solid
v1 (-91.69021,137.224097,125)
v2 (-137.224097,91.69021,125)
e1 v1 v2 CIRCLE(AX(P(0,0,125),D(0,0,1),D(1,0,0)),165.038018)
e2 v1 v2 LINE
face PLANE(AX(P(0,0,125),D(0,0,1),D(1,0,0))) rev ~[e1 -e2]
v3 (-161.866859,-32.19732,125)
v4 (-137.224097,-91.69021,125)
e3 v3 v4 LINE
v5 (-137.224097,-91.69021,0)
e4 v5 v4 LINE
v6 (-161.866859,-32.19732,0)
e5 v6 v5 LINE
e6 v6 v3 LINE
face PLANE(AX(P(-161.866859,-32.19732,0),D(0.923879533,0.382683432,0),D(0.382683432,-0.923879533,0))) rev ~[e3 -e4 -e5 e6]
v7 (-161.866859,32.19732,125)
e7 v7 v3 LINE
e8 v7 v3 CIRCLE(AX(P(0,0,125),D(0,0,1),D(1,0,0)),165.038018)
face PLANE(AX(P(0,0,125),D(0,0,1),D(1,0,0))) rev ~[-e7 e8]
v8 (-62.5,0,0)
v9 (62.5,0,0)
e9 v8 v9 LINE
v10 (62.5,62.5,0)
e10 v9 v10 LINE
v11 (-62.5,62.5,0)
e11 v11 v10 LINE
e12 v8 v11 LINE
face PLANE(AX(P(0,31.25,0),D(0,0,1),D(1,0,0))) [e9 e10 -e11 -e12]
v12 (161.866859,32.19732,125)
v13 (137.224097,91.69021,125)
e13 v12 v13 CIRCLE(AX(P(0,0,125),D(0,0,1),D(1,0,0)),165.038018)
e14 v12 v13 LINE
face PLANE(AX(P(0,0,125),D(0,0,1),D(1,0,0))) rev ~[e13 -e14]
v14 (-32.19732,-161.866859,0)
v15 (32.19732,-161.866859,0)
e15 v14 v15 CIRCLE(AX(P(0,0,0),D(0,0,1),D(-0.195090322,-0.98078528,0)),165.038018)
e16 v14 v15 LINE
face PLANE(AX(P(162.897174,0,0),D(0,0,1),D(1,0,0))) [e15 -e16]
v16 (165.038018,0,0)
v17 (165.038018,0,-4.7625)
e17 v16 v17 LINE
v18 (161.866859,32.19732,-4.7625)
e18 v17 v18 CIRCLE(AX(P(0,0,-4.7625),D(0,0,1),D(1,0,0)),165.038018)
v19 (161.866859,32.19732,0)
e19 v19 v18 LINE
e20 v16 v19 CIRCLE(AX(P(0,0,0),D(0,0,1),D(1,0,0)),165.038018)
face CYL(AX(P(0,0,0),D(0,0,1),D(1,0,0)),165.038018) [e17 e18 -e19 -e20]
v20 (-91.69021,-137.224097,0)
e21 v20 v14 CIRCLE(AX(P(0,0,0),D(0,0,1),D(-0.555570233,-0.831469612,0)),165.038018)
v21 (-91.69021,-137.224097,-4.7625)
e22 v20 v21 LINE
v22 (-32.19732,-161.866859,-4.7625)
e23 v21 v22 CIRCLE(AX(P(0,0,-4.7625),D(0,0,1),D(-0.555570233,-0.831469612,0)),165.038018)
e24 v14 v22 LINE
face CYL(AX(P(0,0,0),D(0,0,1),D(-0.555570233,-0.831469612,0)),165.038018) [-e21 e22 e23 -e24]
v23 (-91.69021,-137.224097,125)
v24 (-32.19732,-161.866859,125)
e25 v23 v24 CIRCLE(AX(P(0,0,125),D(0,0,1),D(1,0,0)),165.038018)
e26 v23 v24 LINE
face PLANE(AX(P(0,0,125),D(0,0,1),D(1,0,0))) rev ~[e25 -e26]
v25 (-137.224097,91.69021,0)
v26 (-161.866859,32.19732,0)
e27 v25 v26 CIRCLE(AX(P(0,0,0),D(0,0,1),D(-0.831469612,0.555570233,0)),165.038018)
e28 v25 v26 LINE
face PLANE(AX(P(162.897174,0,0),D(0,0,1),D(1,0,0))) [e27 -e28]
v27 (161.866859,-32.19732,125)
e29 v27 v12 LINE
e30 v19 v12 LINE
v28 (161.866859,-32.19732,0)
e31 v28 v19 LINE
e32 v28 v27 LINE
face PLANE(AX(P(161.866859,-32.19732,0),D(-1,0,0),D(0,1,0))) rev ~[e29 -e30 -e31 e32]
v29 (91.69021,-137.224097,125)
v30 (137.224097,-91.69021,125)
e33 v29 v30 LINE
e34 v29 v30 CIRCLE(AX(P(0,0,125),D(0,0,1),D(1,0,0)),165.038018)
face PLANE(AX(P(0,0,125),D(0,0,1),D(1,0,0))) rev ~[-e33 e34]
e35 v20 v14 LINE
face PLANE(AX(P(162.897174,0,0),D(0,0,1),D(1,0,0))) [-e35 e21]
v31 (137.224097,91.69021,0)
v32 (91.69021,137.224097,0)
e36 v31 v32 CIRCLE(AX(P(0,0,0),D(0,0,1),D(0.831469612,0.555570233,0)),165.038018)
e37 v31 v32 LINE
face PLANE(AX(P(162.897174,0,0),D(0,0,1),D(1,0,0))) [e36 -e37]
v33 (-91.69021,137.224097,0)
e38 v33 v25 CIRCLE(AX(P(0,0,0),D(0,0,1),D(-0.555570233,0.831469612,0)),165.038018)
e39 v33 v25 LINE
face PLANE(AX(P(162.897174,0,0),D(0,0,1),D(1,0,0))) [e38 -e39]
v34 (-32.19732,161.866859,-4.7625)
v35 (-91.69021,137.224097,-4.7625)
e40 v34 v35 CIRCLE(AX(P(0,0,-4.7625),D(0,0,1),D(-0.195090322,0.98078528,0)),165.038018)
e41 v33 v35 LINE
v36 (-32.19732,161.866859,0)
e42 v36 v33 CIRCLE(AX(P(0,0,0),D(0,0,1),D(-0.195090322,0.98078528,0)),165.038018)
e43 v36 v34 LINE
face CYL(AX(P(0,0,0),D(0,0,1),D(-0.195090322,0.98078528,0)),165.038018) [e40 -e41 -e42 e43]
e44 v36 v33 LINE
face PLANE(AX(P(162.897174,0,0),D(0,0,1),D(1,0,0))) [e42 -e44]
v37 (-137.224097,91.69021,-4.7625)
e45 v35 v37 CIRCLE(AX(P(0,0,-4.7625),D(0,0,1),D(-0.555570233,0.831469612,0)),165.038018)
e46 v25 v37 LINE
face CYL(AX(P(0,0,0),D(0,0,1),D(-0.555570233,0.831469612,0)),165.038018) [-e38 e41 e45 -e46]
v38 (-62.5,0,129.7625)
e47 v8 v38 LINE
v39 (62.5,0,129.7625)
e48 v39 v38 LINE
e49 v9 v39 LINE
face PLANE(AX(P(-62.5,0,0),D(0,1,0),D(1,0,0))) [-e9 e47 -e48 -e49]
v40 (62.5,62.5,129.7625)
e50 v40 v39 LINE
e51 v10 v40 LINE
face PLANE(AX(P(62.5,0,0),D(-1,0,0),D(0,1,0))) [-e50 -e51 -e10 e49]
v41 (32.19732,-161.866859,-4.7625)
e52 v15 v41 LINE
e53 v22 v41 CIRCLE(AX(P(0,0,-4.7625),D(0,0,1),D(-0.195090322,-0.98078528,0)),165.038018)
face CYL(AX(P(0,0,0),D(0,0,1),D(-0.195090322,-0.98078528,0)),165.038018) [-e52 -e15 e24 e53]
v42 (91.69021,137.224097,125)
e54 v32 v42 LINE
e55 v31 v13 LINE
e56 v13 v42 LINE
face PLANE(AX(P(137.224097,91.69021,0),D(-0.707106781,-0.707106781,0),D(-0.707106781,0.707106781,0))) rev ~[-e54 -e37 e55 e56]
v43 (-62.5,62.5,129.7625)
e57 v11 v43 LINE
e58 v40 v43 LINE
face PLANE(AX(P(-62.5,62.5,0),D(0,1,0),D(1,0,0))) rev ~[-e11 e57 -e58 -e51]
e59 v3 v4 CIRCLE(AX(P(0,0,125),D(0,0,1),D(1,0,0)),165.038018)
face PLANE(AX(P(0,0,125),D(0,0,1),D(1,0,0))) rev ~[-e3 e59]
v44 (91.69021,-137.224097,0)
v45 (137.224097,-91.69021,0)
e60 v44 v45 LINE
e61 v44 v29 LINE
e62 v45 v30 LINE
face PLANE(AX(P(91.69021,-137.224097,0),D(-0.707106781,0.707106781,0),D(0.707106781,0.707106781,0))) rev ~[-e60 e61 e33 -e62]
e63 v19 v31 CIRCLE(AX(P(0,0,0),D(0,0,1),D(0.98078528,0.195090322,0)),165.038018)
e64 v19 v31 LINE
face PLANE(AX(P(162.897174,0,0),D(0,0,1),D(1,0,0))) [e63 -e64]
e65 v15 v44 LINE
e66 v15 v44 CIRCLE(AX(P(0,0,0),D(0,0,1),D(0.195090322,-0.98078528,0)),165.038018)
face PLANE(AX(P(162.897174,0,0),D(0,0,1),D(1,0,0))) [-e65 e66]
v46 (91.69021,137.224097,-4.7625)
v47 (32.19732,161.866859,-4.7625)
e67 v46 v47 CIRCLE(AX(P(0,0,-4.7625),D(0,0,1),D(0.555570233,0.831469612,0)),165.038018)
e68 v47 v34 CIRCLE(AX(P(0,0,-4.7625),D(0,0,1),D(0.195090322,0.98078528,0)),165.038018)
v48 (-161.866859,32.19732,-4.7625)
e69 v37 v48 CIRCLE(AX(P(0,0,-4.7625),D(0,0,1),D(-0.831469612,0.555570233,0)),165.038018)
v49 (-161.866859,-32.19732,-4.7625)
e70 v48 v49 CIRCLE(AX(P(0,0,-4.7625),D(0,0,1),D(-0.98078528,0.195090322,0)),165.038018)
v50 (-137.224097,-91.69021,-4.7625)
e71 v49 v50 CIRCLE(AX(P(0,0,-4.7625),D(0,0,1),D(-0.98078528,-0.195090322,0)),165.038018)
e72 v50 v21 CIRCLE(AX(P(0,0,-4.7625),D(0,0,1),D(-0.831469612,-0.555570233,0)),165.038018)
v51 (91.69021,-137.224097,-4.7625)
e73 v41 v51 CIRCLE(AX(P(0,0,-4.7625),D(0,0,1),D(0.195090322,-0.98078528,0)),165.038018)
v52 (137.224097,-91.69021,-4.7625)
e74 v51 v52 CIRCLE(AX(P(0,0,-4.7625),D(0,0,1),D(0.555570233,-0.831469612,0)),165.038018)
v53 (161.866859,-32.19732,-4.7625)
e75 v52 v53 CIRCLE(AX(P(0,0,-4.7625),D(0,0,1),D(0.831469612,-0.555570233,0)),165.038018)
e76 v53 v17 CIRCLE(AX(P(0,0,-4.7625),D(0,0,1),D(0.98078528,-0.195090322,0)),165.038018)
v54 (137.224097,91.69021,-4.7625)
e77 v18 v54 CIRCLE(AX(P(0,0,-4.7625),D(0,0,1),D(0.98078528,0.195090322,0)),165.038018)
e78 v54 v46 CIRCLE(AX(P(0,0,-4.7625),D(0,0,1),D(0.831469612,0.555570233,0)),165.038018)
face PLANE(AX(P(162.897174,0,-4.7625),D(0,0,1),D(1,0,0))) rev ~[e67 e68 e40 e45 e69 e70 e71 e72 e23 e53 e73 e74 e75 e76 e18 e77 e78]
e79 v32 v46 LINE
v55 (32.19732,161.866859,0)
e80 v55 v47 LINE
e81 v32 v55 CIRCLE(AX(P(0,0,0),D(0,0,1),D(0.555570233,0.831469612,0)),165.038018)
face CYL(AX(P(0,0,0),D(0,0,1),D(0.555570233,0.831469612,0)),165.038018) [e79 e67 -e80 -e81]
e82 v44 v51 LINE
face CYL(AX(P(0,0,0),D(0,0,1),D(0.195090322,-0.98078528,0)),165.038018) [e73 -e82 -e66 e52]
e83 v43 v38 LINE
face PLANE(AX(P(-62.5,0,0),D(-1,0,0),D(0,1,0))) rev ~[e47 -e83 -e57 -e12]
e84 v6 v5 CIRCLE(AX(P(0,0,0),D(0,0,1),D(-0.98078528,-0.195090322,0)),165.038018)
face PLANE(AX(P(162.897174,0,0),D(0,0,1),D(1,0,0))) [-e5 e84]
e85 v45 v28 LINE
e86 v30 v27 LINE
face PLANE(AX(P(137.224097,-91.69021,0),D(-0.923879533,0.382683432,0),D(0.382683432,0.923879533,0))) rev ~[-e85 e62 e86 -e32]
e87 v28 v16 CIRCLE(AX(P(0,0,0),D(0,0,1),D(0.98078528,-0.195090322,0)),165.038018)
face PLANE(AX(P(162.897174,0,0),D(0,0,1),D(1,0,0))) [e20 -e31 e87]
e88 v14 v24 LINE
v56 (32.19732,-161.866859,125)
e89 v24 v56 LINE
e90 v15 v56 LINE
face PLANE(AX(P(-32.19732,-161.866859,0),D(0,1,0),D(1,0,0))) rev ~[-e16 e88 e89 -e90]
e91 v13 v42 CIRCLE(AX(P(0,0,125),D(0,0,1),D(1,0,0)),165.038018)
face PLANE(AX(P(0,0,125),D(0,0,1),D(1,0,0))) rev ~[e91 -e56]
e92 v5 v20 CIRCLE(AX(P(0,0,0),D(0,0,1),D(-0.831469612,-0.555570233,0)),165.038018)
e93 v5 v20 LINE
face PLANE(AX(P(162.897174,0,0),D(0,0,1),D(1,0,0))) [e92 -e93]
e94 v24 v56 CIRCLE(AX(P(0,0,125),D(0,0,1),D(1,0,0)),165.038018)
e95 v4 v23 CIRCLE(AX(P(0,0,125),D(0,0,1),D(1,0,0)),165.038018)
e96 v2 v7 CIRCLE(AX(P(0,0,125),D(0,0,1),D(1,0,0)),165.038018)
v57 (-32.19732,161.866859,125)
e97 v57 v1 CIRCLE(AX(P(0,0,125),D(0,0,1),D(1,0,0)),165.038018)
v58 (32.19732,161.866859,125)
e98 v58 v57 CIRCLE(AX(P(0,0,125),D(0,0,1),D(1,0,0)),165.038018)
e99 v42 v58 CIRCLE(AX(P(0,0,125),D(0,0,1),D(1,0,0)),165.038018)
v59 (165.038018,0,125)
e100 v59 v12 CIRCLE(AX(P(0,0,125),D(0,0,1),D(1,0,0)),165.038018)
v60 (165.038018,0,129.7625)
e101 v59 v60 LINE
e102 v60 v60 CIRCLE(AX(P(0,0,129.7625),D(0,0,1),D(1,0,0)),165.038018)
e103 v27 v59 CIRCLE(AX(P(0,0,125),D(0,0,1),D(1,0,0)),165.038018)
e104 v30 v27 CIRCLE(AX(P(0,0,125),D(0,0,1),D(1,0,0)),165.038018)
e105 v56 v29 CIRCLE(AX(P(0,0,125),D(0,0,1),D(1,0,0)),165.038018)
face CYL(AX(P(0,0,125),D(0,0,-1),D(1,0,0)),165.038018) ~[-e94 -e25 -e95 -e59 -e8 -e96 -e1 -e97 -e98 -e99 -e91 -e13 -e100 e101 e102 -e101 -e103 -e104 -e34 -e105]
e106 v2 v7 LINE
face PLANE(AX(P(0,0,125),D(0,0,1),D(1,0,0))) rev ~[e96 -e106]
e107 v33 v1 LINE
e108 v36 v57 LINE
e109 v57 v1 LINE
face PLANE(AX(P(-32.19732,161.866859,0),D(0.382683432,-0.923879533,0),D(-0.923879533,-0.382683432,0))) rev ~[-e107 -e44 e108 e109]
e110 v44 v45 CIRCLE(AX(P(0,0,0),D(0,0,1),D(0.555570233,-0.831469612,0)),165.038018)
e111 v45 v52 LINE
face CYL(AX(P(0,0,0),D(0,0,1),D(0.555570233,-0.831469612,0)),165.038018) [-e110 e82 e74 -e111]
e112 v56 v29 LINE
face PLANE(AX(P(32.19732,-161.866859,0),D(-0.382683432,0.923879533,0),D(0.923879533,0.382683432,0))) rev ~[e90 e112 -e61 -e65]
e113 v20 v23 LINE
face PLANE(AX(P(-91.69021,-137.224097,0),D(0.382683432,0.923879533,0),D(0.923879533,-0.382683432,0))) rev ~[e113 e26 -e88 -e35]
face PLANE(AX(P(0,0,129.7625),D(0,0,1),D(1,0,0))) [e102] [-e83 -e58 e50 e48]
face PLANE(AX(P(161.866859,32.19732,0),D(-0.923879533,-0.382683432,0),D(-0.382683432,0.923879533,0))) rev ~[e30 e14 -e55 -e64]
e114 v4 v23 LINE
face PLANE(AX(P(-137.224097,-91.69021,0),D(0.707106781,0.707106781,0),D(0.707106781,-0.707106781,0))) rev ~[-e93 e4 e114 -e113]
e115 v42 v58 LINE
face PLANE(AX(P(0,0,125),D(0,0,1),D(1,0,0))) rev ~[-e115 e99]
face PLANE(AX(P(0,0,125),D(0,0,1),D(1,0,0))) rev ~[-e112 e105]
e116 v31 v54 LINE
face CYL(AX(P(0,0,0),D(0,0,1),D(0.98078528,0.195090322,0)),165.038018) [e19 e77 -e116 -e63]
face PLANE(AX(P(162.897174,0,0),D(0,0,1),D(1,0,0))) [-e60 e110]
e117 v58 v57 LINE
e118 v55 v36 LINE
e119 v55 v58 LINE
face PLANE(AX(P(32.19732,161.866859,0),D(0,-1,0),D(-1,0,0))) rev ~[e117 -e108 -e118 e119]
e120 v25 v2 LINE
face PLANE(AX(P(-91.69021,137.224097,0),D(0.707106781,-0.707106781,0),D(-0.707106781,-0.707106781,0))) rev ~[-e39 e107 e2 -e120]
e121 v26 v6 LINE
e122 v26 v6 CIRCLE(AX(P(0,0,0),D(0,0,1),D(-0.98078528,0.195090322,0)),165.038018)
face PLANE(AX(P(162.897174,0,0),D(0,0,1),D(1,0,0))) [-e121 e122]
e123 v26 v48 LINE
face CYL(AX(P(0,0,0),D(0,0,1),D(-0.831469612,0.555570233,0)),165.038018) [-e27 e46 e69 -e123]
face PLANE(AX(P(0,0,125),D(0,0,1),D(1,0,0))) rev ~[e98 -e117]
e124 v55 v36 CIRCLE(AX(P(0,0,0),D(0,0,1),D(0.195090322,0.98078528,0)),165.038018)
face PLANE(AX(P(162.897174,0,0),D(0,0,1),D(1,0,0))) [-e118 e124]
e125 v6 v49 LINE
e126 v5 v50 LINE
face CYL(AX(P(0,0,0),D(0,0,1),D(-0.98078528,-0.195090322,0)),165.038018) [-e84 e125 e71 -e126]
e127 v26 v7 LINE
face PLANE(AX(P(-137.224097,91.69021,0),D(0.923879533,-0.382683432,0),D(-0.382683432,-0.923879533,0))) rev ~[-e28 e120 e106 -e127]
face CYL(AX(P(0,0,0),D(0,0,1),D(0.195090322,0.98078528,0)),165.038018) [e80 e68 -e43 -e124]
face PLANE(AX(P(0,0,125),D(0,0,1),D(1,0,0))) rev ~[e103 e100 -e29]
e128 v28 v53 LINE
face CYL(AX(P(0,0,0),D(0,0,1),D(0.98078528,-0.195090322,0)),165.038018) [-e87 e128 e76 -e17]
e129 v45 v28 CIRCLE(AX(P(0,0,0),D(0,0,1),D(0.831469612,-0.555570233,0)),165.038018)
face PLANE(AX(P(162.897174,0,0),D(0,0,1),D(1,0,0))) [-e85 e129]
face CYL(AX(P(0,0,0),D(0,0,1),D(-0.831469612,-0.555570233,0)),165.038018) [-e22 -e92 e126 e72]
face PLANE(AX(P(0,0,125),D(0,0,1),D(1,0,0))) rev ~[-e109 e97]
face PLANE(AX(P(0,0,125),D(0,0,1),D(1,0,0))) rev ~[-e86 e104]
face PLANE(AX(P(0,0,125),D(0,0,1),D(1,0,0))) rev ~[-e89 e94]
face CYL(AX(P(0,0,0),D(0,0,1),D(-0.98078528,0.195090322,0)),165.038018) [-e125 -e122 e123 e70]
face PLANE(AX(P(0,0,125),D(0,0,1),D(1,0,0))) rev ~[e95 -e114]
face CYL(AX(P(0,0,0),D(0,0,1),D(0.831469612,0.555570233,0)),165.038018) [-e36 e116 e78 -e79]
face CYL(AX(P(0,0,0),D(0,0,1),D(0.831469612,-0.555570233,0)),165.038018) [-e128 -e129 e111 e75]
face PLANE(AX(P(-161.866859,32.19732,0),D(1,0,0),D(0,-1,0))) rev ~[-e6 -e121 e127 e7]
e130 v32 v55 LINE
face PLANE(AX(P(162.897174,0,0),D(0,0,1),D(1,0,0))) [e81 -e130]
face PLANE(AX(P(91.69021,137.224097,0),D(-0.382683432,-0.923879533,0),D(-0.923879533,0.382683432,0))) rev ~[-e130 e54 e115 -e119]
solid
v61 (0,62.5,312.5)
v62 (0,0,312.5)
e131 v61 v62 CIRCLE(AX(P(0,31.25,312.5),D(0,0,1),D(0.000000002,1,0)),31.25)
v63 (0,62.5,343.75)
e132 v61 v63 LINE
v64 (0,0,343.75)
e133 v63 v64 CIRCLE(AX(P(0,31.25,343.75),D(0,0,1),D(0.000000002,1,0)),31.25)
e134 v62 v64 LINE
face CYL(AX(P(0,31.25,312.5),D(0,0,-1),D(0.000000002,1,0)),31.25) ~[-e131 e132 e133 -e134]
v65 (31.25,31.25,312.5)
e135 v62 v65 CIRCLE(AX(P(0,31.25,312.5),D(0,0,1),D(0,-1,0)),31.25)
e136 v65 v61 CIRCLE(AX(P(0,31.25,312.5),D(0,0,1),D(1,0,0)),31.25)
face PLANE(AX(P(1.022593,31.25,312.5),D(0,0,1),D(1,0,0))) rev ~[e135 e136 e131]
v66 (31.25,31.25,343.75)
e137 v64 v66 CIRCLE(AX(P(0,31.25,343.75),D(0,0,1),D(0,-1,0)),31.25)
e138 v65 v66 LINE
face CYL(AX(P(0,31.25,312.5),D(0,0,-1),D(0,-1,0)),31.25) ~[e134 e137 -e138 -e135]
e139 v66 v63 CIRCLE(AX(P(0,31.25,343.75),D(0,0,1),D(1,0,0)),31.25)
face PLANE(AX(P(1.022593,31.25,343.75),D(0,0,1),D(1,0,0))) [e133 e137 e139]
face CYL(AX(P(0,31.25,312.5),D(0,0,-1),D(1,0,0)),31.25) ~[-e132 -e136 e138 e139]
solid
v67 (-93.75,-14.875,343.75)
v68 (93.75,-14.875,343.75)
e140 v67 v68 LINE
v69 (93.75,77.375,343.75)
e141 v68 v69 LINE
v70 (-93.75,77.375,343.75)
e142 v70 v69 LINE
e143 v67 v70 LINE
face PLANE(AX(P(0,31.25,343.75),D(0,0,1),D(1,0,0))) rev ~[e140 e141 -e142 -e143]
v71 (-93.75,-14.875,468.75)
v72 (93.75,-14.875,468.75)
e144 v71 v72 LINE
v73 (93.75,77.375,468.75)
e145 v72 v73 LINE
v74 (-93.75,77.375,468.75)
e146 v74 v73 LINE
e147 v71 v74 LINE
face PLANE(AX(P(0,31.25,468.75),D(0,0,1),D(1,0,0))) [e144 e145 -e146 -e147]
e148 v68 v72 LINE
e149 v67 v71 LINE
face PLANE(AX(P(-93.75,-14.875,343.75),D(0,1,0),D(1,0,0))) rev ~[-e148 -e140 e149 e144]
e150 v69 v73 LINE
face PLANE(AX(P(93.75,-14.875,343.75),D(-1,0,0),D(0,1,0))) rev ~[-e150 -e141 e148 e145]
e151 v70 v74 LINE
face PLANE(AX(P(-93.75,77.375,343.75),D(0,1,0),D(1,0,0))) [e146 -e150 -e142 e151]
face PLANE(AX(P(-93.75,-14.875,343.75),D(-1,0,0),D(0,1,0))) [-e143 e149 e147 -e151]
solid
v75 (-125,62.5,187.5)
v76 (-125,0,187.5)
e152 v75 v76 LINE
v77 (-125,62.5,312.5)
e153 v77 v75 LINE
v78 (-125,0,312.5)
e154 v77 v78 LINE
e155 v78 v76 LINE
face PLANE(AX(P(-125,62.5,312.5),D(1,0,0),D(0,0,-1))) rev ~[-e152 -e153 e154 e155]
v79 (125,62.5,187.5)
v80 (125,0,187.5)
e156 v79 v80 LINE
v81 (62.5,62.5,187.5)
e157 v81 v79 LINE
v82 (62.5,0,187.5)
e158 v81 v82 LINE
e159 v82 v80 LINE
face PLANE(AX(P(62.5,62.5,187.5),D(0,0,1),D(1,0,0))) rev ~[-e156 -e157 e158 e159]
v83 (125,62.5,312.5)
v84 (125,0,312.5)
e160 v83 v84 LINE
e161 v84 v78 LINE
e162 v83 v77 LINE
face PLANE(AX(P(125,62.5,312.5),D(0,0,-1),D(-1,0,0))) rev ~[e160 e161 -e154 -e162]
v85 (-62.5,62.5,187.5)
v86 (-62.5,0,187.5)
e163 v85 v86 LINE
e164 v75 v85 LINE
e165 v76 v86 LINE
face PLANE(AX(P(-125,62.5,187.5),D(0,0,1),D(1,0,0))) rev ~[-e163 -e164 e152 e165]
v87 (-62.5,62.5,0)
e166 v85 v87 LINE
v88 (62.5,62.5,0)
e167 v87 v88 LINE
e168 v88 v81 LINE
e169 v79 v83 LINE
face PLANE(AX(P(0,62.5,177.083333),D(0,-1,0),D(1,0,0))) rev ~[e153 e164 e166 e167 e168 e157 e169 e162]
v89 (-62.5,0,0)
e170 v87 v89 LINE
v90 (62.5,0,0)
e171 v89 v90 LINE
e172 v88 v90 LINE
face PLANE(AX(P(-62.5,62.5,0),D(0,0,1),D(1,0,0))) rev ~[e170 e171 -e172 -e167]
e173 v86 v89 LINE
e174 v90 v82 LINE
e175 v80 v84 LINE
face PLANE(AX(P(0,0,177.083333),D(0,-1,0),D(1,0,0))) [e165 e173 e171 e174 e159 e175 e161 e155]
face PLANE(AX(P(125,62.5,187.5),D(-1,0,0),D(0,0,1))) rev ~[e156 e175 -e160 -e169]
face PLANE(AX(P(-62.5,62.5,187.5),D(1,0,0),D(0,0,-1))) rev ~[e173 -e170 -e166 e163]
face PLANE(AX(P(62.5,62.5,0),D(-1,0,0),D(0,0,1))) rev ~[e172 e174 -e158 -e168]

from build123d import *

# Parameters (mm, degrees)
F3_W      = 125
F3_H      = 62.5
F4_DEPTH  = 4.7625
F5_DEPTH  = 125
F6_R      = 165.0380183748
F7_DEPTH  = 4.7625
F8_DEPTH  = 386
F11_DEPTH = 62.5
F13_DEPTH = 31.25
F14_W     = 187.5
F14_H     = 92.25
F15_DEPTH = 125


# Not quite as in the source:
# - a length typed as a fraction of an inch, garbled in the dataset ("3 / 203.2 mm" for 3/8 in), is restored
# - a feature names something its author has since deleted; it is built from what else it names


with BuildPart() as f4:
    # F3 (on Top) → F4 (new body)
    with BuildSketch(Plane.XY):
        with BuildLine():
            ThreePointArc((161.8668591289, -32.1973201496), (164.2433152069, -16.1765546068), (165.0380183748, 0))
            ThreePointArc((165.0380183748, 0), (164.2433152069, 16.1765546068), (161.8668591289, 32.1973201496))
            Line((161.8668591289, 32.1973201496), (161.8668591289, -32.1973201496))
        make_face()
        with BuildLine():
            Line((137.2240971533, 91.6902103256), (161.8668591289, 32.1973201496))
            ThreePointArc((161.8668591289, 32.1973201496), (152.4752472627, 63.1573153424), (137.2240971533, 91.6902103256))
        make_face()
        Polygon((161.8668591289, -32.1973201496), (161.8668591289, 32.1973201496), (137.2240971533, 91.6902103256), (91.6902103256, 137.2240971533), (32.1973201496, 161.8668591289), (-32.1973201496, 161.8668591289), (-91.6902103256, 137.2240971533), (-137.2240971533, 91.6902103256), (-161.8668591289, 32.1973201496), (-161.8668591289, -32.1973201496), (-137.2240971533, -91.6902103256), (-91.6902103256, -137.2240971533), (-32.1973201496, -161.8668591289), (32.1973201496, -161.8668591289), (91.6902103256, -137.2240971533), (137.2240971533, -91.6902103256), align=None)
        with Locations((0, 31.25)):
            Rectangle(F3_W, F3_H, mode=Mode.SUBTRACT)
        with BuildLine():
            ThreePointArc((137.2240971533, -91.6902103256), (152.4752472627, -63.1573153424), (161.8668591289, -32.1973201496))
            Line((161.8668591289, -32.1973201496), (137.2240971533, -91.6902103256))
        make_face()
        with BuildLine():
            Line((91.6902103256, 137.2240971533), (137.2240971533, 91.6902103256))
            ThreePointArc((137.2240971533, 91.6902103256), (116.6995019464, 116.6995019464), (91.6902103256, 137.2240971533))
        make_face()
        with BuildLine():
            ThreePointArc((91.6902103256, -137.2240971533), (116.6995019464, -116.6995019464), (137.2240971533, -91.6902103256))
            Line((137.2240971533, -91.6902103256), (91.6902103256, -137.2240971533))
        make_face()
        with BuildLine():
            Line((32.1973201496, 161.8668591289), (91.6902103256, 137.2240971533))
            ThreePointArc((91.6902103256, 137.2240971533), (63.1573153424, 152.4752472627), (32.1973201496, 161.8668591289))
        make_face()
        with BuildLine():
            ThreePointArc((32.1973201496, -161.8668591289), (63.1573153424, -152.4752472627), (91.6902103256, -137.2240971533))
            Line((91.6902103256, -137.2240971533), (32.1973201496, -161.8668591289))
        make_face()
        with BuildLine():
            Line((-32.1973201496, 161.8668591289), (32.1973201496, 161.8668591289))
            ThreePointArc((32.1973201496, 161.8668591289), (0, 165.0380183748), (-32.1973201496, 161.8668591289))
        make_face()
        with BuildLine():
            ThreePointArc((-32.1973201496, -161.8668591289), (0, -165.0380183748), (32.1973201496, -161.8668591289))
            Line((32.1973201496, -161.8668591289), (-32.1973201496, -161.8668591289))
        make_face()
        with BuildLine():
            Line((-91.6902103256, 137.2240971533), (-32.1973201496, 161.8668591289))
            ThreePointArc((-32.1973201496, 161.8668591289), (-63.1573153424, 152.4752472627), (-91.6902103256, 137.2240971533))
        make_face()
        with BuildLine():
            ThreePointArc((-91.6902103256, -137.2240971533), (-63.1573153424, -152.4752472627), (-32.1973201496, -161.8668591289))
            Line((-32.1973201496, -161.8668591289), (-91.6902103256, -137.2240971533))
        make_face()
        with BuildLine():
            Line((-137.2240971533, 91.6902103256), (-91.6902103256, 137.2240971533))
            ThreePointArc((-91.6902103256, 137.2240971533), (-116.6995019464, 116.6995019464), (-137.2240971533, 91.6902103256))
        make_face()
        with BuildLine():
            ThreePointArc((-137.2240971533, -91.6902103256), (-116.6995019464, -116.6995019464), (-91.6902103256, -137.2240971533))
            Line((-91.6902103256, -137.2240971533), (-137.2240971533, -91.6902103256))
        make_face()
        with BuildLine():
            Line((-161.8668591289, 32.1973201496), (-137.2240971533, 91.6902103256))
            ThreePointArc((-137.2240971533, 91.6902103256), (-152.4752472627, 63.1573153424), (-161.8668591289, 32.1973201496))
        make_face()
        with BuildLine():
            ThreePointArc((-161.8668591289, -32.1973201496), (-152.4752472627, -63.1573153424), (-137.2240971533, -91.6902103256))
            Line((-137.2240971533, -91.6902103256), (-161.8668591289, -32.1973201496))
        make_face()
        with BuildLine():
            Line((-161.8668591289, -32.1973201496), (-161.8668591289, 32.1973201496))
            ThreePointArc((-161.8668591289, 32.1973201496), (-165.0380183748, 0), (-161.8668591289, -32.1973201496))
        make_face()
        with Locations((0, 31.25)):
            Rectangle(F3_W, F3_H)
    extrude(amount=-F4_DEPTH)

    # F3 (on Top) → F5 (join)
    with BuildSketch(Plane.XY):
        Polygon((161.8668591289, -32.1973201496), (161.8668591289, 32.1973201496), (137.2240971533, 91.6902103256), (91.6902103256, 137.2240971533), (32.1973201496, 161.8668591289), (-32.1973201496, 161.8668591289), (-91.6902103256, 137.2240971533), (-137.2240971533, 91.6902103256), (-161.8668591289, 32.1973201496), (-161.8668591289, -32.1973201496), (-137.2240971533, -91.6902103256), (-91.6902103256, -137.2240971533), (-32.1973201496, -161.8668591289), (32.1973201496, -161.8668591289), (91.6902103256, -137.2240971533), (137.2240971533, -91.6902103256), align=None)
        with Locations((0, 31.25)):
            Rectangle(F3_W, F3_H, mode=Mode.SUBTRACT)
        with Locations((0, 31.25)):
            Rectangle(F3_W, F3_H)
    extrude(amount=F5_DEPTH)

    # F6 (on face) → F7 (join)
    with BuildSketch(Plane.XY.offset(125)):
        Circle(F6_R)
    extrude(amount=F7_DEPTH)


with BuildPart() as f8:
    # F3 (on Top) → F8 (new body)
    with BuildSketch(Plane.XY):
        with Locations((0, 31.25)):
            Rectangle(F3_W, F3_H)
    extrude(amount=F8_DEPTH)


with BuildPart() as f4_1:
    add(f4.part)

    # F9: cut F8
    add(f8.part, mode=Mode.SUBTRACT)


with BuildPart() as f11:
    # F10 (on face) → F11 (new body)
    with BuildSketch(Plane.XZ.offset(-62.5)):
        Polygon((-62.5, 187.5), (-62.5, 0), (62.5, 0), (62.5, 187.5), (125, 187.5), (125, 312.5), (-125, 312.5), (-125, 187.5), align=None)
    extrude(amount=F11_DEPTH)


with BuildPart() as f13:
    # F12 (on face) → F13 (new body)
    with BuildSketch(Plane.XY.offset(312.5)):
        with BuildLine():
            ThreePointArc((9.8e-09, 0), (22.0970869155, 9.1529130914), (31.25, 31.25))
            ThreePointArc((31.25, 31.25), (22.0970869306, 53.3470868935), (5.24e-08, 62.5))
            ThreePointArc((5.24e-08, 62.5), (-31.25, 31.2500000213), (9.8e-09, 0))
        make_face()
    extrude(amount=F13_DEPTH)


with BuildPart() as f15:
    # F14 (on face) → F15 (new body)
    with BuildSketch(Plane.XY.offset(343.75)):
        with Locations((0, 31.25)):
            Rectangle(F14_W, F14_H)
    extrude(amount=F15_DEPTH)


solid = Compound([f4_1.part, f11.part, f13.part, f15.part])
